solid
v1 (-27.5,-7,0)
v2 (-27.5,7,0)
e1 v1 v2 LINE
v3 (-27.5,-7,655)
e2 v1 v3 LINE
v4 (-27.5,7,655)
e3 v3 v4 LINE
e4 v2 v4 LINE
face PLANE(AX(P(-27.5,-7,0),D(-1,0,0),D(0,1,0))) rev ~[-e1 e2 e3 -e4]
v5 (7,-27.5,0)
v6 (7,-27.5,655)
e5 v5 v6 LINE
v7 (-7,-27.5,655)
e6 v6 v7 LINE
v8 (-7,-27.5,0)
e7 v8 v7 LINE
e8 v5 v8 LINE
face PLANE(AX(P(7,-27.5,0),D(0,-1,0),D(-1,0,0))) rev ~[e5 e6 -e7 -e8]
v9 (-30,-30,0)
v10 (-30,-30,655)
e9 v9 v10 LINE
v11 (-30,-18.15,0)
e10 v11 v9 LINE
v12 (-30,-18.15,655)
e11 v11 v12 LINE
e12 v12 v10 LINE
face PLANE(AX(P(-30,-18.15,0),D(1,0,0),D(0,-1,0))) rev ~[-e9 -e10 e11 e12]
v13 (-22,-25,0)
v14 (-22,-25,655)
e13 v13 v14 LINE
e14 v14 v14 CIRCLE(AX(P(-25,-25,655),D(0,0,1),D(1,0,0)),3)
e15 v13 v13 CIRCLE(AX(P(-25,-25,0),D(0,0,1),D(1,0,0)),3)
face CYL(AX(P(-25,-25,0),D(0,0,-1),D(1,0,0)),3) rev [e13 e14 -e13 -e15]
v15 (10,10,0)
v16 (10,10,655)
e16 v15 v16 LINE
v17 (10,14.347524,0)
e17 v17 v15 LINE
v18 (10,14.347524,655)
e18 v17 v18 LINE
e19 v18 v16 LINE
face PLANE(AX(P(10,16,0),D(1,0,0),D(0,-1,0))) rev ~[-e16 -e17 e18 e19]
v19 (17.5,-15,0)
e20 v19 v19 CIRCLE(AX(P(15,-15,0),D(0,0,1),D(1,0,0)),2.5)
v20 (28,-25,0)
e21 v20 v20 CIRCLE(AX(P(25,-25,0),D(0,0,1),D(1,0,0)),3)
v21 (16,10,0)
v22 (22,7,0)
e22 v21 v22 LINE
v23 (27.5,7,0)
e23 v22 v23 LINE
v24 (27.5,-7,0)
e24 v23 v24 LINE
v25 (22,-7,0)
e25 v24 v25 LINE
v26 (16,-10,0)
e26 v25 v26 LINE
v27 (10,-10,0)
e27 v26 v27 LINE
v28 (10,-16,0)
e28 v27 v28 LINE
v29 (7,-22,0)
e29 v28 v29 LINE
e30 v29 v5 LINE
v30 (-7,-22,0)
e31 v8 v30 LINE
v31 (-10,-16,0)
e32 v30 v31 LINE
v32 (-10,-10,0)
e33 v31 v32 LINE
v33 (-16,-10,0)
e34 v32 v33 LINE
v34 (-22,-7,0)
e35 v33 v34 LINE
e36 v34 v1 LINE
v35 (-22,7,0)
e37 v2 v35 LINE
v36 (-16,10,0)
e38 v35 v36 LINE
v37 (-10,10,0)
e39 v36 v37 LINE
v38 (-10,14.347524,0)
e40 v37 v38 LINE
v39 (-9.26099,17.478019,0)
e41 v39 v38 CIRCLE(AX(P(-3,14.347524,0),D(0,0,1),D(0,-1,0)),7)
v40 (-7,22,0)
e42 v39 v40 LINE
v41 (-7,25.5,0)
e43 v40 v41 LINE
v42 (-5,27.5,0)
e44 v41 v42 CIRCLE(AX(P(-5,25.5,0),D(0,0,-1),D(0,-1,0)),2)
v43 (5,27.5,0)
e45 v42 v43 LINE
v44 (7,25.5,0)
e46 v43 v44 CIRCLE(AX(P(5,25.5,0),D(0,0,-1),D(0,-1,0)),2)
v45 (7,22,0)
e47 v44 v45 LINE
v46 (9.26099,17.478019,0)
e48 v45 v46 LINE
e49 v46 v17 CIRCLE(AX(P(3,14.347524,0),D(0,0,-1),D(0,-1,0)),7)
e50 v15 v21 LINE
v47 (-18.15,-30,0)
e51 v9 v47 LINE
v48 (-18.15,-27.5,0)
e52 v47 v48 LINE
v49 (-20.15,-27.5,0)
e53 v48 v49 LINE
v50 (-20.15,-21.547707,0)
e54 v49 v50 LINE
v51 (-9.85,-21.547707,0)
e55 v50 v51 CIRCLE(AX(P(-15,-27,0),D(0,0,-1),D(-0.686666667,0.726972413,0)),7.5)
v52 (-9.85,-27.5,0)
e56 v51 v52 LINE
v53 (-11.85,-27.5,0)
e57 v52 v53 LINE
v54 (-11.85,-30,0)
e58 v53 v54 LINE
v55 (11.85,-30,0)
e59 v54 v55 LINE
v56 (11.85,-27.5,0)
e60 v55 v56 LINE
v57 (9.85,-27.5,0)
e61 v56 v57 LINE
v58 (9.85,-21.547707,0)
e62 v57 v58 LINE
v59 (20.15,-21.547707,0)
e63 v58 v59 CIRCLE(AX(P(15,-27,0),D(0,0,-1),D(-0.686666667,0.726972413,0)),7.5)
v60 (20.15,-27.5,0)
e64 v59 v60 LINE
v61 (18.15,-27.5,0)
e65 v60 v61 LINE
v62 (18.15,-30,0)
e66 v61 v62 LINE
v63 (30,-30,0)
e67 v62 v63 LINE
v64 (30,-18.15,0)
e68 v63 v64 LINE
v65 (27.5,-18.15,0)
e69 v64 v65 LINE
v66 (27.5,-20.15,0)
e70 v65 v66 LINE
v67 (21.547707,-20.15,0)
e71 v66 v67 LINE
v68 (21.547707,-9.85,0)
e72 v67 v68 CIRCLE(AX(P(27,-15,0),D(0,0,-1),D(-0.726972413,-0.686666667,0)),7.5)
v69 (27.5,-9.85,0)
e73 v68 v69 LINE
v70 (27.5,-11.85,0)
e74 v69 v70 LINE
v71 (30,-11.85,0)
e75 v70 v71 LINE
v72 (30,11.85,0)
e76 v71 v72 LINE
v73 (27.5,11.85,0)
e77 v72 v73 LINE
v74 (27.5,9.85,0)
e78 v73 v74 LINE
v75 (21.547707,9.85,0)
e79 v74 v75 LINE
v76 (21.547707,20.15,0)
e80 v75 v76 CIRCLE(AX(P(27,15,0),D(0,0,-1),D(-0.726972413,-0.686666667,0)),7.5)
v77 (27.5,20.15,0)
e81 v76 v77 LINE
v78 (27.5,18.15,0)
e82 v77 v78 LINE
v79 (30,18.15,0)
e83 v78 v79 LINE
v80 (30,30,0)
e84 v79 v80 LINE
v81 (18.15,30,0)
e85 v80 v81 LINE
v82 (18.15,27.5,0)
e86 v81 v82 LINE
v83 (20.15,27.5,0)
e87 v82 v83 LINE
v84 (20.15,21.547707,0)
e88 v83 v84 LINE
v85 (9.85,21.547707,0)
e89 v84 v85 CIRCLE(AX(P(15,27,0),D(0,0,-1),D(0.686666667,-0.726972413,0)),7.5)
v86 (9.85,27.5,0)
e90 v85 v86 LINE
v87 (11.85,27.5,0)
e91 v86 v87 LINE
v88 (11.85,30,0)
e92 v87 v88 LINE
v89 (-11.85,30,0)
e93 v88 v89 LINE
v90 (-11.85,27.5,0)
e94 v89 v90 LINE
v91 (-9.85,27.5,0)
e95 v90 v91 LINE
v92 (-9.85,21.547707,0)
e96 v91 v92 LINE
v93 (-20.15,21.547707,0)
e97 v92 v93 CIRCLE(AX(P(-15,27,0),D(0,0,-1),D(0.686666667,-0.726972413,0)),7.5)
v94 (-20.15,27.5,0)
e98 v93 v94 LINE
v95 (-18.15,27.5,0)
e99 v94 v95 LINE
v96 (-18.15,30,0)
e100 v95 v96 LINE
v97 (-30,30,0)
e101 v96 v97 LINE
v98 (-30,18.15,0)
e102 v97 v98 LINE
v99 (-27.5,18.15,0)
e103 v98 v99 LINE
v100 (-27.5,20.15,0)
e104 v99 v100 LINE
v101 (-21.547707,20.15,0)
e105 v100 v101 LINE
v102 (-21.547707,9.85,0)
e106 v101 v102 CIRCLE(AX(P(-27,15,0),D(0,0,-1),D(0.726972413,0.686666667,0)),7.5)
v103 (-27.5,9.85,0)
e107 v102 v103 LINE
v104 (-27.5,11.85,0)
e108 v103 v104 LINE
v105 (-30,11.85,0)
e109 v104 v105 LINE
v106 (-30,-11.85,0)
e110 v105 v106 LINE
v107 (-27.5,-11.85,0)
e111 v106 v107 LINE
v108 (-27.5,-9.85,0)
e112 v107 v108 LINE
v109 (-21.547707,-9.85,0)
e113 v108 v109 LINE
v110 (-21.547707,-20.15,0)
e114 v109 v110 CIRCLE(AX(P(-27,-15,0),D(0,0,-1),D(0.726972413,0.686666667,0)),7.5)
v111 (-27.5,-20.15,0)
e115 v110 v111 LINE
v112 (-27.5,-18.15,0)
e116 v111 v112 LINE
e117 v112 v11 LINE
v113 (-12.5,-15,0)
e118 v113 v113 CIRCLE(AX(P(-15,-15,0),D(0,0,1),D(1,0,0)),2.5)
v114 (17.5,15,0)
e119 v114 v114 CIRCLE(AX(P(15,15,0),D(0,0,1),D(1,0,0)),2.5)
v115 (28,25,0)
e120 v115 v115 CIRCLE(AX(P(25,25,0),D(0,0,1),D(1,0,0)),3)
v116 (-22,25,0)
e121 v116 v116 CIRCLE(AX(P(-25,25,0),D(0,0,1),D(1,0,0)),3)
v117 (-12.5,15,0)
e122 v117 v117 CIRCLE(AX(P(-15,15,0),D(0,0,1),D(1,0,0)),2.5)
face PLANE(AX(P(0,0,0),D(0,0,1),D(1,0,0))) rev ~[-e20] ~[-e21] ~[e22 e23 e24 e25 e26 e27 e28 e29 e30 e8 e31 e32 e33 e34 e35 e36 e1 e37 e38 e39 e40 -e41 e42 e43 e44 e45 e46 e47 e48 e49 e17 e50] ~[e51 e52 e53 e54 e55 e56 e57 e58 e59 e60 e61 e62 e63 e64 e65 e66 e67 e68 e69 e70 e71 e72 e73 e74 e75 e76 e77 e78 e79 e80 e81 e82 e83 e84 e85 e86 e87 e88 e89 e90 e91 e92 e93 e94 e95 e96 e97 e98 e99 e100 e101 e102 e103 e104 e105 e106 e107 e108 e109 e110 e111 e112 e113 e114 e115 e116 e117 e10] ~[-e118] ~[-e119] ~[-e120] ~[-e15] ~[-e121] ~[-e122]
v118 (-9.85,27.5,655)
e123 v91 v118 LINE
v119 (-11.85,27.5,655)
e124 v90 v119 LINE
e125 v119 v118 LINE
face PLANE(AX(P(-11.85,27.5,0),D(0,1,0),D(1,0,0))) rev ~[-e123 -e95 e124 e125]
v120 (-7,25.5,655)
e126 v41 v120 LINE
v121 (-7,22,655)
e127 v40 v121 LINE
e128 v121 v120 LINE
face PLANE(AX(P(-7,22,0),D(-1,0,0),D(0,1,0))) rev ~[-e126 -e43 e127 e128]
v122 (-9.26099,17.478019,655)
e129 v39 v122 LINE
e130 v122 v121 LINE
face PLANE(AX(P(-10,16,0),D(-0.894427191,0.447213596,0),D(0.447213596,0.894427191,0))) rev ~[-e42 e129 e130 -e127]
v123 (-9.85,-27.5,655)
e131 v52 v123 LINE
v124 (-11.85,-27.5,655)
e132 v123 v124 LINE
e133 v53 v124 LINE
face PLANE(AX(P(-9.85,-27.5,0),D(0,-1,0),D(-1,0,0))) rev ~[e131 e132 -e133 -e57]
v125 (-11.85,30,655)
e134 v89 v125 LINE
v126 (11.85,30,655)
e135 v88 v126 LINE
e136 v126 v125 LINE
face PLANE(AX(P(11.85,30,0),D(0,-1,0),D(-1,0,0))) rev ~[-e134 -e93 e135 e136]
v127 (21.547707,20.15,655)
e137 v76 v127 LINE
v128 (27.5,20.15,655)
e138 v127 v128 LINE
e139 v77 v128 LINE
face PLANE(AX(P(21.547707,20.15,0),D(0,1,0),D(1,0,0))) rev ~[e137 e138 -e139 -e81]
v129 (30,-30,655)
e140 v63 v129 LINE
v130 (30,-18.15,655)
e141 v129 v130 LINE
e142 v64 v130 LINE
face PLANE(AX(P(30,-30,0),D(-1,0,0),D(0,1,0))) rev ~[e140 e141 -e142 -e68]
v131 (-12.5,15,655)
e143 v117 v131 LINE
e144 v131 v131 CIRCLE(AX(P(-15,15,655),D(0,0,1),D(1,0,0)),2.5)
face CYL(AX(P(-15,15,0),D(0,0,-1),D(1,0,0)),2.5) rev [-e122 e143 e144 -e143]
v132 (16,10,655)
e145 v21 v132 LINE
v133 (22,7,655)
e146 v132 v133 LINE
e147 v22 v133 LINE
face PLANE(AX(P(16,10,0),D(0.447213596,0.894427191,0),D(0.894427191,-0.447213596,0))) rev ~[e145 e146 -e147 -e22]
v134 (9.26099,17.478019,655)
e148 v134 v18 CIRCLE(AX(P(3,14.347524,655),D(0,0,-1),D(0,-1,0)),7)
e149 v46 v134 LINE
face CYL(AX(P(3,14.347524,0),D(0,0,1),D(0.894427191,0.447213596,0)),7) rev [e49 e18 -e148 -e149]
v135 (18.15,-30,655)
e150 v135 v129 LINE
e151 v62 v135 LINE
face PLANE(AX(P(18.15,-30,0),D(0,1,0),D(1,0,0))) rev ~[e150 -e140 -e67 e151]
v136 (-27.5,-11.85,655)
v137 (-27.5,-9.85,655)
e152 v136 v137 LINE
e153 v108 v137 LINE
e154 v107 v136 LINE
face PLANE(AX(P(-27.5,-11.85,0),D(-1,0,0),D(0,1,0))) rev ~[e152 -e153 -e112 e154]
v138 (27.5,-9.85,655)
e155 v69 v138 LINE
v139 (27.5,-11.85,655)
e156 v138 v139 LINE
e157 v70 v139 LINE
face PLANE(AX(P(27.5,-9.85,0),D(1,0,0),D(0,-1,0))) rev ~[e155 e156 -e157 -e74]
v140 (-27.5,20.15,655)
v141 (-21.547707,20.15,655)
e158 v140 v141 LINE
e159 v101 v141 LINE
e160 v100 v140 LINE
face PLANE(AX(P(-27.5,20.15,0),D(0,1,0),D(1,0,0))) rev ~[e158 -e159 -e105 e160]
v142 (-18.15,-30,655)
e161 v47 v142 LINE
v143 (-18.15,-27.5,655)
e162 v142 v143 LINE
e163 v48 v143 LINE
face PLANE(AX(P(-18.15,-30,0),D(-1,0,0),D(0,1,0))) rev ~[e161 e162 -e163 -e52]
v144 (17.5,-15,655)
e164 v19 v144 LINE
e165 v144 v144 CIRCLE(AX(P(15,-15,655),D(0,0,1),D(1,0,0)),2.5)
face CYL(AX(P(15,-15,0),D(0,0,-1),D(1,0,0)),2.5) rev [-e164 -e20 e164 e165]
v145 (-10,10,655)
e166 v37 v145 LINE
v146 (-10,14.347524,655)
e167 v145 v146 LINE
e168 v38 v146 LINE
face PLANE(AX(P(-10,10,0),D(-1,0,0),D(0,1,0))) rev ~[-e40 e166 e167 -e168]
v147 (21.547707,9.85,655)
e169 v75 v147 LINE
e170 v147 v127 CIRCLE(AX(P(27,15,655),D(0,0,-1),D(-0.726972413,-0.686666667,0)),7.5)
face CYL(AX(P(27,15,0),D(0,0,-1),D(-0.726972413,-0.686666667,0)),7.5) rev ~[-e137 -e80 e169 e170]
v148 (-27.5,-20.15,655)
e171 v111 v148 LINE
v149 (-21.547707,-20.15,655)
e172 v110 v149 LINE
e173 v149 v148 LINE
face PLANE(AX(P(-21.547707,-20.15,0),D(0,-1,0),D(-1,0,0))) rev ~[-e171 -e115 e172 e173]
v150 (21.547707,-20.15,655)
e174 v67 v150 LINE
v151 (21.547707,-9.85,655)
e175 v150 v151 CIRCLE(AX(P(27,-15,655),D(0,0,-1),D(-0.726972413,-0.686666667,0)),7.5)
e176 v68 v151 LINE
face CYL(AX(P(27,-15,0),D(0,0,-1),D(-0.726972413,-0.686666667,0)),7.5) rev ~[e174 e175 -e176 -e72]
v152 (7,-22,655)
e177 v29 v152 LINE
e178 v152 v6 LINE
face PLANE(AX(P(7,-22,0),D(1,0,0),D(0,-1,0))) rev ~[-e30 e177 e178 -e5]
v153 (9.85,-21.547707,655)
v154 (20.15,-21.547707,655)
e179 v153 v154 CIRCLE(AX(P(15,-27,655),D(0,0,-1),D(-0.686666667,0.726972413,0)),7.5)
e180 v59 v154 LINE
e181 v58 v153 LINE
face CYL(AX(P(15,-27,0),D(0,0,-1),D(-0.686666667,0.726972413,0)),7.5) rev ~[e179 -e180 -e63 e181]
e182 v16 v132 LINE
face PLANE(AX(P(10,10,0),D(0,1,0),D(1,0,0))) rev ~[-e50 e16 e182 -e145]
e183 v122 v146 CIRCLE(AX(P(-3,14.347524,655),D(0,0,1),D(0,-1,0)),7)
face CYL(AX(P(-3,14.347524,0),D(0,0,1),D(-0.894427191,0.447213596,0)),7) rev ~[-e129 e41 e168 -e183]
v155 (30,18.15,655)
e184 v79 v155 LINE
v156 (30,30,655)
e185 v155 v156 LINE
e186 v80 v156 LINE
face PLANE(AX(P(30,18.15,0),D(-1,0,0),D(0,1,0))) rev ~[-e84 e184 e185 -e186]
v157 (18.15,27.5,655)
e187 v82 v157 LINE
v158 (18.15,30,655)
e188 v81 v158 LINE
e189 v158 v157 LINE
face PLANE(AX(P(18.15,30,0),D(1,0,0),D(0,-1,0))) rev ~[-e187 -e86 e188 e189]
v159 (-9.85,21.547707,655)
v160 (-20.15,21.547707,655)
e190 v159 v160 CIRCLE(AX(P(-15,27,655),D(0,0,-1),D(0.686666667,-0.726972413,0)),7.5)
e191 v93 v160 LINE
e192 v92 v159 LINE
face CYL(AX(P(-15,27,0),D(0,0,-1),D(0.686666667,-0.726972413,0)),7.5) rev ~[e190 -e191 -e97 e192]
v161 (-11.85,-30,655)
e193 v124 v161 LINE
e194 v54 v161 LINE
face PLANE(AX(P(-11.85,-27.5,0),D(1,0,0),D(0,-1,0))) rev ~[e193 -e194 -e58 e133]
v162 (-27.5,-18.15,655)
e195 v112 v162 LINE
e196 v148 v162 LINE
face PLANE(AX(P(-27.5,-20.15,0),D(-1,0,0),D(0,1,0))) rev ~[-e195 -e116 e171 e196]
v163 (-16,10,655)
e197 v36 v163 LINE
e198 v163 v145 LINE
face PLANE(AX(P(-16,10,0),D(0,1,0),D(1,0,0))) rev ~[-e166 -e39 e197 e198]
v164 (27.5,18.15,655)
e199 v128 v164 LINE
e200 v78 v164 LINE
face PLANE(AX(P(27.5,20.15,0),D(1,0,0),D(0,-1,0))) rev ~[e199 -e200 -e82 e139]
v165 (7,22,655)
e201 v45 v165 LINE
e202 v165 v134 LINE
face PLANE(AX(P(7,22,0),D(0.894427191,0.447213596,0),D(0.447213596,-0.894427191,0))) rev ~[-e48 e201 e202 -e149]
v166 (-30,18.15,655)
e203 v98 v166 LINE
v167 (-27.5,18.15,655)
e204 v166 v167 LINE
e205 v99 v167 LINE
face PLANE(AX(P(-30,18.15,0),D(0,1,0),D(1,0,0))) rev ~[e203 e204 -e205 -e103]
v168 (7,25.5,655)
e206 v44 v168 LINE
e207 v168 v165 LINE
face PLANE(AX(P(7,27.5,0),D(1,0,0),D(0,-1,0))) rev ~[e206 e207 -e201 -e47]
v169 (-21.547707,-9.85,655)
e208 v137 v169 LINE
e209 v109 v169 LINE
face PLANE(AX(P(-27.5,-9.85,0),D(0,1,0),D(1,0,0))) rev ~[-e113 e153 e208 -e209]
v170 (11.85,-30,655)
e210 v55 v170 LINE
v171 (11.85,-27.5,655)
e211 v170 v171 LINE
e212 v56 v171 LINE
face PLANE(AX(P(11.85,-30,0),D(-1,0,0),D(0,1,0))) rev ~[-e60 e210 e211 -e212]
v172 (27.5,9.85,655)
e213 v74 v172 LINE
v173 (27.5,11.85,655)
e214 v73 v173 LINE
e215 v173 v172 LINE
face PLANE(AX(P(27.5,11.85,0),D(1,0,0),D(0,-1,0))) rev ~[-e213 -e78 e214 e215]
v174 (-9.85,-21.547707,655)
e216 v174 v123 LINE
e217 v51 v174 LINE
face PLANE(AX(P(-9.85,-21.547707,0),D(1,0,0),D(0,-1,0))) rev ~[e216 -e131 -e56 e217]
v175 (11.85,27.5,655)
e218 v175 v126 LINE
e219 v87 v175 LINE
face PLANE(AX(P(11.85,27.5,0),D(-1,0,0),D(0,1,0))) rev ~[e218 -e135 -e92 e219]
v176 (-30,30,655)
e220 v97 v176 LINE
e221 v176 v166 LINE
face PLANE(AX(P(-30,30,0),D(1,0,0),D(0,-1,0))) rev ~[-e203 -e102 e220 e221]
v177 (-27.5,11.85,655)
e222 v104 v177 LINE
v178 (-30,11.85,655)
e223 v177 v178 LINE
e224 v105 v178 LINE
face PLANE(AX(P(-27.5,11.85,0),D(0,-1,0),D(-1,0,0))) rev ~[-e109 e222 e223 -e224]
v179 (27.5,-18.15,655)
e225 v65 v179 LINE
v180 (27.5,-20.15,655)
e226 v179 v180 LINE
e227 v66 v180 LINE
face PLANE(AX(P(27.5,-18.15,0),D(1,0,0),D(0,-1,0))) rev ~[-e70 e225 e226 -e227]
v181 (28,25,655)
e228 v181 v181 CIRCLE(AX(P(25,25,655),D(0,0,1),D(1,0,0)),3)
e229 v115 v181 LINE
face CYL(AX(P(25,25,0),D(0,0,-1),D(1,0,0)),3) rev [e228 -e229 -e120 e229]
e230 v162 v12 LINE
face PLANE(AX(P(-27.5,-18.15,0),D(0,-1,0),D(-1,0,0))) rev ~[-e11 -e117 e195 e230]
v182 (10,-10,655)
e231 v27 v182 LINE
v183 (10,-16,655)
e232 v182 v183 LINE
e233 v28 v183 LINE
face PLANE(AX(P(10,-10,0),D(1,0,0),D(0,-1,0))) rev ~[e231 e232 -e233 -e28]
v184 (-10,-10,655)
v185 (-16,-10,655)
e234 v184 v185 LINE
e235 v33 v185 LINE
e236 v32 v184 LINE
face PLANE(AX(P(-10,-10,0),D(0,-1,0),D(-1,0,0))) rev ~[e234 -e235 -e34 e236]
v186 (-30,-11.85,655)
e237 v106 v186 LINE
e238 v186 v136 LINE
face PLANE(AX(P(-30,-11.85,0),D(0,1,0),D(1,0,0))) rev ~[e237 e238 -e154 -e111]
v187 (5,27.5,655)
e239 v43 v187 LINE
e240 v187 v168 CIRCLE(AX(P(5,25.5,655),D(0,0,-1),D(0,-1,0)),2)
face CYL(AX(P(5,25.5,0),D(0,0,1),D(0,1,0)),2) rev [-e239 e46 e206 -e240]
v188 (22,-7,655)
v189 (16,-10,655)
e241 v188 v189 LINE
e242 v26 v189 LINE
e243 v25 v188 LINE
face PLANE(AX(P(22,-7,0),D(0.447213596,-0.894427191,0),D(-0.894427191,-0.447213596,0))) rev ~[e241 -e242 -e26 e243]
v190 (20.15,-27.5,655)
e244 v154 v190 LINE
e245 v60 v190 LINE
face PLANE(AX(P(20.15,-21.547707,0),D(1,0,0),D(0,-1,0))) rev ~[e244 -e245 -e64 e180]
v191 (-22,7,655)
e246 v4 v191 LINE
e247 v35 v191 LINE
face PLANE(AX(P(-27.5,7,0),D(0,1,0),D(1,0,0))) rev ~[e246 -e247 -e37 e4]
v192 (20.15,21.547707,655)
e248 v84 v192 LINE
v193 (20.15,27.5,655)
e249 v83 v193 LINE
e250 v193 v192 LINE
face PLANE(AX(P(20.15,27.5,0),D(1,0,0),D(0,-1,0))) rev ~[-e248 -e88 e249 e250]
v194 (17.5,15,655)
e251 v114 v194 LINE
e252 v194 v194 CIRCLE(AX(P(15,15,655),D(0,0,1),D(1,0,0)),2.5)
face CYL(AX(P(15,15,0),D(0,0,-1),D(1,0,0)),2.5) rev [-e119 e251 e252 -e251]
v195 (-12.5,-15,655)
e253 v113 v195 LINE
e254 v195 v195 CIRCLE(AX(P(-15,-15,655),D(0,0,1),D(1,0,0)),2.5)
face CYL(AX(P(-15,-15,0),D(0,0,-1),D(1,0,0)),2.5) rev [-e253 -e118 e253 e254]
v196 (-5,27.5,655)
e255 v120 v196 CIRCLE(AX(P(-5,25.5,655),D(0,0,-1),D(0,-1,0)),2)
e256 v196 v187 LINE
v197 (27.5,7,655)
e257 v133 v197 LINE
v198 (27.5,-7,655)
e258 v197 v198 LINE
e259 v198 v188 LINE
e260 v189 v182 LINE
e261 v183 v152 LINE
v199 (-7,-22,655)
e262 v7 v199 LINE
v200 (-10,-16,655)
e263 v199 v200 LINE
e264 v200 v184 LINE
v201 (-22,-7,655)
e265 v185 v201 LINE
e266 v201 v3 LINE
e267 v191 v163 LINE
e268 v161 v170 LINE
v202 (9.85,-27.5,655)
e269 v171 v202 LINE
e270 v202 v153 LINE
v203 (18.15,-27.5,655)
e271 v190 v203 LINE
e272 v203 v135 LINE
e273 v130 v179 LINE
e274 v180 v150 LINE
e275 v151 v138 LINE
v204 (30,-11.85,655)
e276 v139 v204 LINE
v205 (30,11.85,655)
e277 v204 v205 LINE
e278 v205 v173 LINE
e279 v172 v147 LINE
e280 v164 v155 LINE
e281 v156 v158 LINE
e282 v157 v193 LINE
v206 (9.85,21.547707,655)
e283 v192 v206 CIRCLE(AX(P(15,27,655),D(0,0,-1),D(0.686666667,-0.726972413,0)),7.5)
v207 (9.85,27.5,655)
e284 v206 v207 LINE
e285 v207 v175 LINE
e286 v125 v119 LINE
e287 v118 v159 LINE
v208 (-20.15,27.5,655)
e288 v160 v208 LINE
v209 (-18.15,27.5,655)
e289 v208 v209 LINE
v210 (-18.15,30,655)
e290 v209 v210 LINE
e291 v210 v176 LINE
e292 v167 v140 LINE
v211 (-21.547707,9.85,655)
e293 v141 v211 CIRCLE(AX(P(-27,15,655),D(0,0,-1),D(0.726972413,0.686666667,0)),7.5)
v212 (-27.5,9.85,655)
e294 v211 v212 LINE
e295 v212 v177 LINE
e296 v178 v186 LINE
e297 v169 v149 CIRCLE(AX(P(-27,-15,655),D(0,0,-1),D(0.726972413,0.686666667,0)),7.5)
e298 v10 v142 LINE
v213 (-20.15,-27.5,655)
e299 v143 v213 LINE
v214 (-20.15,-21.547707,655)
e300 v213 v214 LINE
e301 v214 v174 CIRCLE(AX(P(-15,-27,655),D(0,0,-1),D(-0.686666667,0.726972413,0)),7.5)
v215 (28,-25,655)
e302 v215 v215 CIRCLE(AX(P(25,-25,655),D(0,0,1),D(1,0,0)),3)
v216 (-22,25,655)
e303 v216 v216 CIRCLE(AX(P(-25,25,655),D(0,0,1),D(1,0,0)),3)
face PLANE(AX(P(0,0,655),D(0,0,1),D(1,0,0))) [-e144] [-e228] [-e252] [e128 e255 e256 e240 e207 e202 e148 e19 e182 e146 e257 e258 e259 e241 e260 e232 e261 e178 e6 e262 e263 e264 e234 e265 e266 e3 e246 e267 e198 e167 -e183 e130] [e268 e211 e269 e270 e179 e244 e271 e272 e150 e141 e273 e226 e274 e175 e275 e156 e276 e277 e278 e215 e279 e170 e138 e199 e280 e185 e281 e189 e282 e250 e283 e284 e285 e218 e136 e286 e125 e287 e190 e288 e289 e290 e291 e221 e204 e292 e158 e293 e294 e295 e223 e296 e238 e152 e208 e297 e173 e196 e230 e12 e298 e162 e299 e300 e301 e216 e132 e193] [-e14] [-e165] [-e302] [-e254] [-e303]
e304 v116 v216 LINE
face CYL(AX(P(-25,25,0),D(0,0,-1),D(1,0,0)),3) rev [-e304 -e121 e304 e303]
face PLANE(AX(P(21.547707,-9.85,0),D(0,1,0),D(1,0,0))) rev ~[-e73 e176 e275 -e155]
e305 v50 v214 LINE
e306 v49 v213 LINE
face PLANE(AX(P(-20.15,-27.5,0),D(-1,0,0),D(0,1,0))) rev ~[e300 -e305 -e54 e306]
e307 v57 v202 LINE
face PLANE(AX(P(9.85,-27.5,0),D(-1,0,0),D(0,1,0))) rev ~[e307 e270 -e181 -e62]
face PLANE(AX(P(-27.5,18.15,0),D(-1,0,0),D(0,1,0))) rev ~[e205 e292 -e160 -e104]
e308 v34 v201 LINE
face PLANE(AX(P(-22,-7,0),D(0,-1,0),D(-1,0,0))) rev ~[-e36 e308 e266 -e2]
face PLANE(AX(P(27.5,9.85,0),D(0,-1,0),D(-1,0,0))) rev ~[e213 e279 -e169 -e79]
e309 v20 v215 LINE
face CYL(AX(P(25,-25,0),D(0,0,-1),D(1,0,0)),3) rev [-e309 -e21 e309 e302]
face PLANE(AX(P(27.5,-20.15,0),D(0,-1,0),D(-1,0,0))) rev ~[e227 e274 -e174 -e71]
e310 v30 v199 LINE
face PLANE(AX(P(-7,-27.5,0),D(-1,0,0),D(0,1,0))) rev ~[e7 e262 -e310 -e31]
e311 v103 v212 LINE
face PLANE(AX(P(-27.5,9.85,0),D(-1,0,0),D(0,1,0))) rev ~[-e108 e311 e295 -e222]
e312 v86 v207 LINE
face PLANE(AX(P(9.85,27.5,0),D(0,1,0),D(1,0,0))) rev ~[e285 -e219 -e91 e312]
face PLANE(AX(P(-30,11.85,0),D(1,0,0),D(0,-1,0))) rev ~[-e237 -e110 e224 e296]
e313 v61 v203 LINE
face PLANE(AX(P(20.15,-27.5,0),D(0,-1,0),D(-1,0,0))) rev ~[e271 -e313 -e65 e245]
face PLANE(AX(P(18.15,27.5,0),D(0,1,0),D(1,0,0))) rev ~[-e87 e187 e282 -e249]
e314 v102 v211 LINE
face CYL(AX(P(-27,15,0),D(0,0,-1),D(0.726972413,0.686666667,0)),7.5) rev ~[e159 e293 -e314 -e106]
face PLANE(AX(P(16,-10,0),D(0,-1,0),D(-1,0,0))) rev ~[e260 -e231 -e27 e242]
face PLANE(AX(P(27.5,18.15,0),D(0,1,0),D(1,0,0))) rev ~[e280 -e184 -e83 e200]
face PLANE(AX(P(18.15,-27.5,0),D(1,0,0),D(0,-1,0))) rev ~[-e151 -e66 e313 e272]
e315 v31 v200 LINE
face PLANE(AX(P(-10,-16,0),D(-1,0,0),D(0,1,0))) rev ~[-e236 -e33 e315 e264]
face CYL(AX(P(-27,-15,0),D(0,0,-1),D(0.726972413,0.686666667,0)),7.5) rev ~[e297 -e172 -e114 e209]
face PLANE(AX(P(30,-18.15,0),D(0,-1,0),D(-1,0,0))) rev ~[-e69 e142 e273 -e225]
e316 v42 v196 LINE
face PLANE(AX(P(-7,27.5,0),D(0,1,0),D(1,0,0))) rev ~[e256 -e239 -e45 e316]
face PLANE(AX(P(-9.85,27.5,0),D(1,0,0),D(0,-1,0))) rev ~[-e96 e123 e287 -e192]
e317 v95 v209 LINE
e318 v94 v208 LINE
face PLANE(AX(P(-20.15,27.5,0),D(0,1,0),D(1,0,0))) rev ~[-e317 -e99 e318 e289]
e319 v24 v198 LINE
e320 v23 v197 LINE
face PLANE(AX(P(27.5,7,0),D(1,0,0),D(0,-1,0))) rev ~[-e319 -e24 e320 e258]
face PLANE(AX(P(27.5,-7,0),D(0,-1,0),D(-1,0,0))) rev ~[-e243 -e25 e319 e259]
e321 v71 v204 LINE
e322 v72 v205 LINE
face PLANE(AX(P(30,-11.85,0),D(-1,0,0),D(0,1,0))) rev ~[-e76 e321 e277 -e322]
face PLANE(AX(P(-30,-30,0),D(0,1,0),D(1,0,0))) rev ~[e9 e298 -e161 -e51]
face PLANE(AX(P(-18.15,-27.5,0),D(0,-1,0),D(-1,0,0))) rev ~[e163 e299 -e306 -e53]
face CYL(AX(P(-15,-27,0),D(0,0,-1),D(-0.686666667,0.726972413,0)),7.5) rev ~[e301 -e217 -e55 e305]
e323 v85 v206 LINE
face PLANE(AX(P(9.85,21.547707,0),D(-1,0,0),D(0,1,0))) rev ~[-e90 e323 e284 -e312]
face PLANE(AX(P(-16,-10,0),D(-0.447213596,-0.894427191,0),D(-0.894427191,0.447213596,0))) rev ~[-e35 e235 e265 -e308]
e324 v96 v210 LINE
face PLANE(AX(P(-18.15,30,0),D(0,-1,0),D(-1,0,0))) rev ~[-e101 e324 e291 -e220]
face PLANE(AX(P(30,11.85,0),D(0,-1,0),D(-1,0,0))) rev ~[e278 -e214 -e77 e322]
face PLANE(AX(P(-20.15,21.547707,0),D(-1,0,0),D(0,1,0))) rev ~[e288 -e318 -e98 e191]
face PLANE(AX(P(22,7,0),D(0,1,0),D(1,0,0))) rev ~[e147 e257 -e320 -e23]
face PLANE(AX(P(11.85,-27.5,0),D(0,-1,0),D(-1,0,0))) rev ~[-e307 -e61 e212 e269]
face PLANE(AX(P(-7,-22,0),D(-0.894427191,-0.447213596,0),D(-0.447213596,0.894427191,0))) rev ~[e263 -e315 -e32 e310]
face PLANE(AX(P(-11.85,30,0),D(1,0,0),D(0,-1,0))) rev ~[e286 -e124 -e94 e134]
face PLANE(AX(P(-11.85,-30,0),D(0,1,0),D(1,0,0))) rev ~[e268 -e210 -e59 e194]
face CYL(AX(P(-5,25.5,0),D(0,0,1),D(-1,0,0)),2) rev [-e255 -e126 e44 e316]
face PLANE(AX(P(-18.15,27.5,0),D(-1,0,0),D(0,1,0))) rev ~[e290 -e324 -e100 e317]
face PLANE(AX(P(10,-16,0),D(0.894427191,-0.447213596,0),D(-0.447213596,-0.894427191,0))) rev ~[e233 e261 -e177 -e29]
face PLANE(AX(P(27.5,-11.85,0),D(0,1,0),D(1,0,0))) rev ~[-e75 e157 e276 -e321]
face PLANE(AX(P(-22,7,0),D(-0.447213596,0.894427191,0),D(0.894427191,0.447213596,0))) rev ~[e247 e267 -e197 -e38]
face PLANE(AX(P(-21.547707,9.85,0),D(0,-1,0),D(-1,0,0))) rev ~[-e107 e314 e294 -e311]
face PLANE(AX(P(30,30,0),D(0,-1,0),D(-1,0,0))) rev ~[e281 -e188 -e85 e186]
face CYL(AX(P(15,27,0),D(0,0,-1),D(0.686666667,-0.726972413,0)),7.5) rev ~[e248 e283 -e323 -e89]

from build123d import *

# Parameters (mm, degrees)
F0_R     = 3
F0_R_2   = 2.5
F1_DEPTH = 655
F2_R     = 2
F3_R     = 7


# Not quite as in the source:
# - a feature names something its author has since deleted; it is built from what else it names


with BuildPart() as f1:
    # F0 (on Top) → F1 (new body)
    with BuildSketch(Plane.XY):
        with BuildLine():
            Line((18.15, -30), (30, -30))
            Line((30, -30), (30, -18.15))
            Line((30, -18.15), (27.5, -18.15))
            Line((27.5, -18.15), (27.5, -20.15))
            Line((27.5, -20.15), (21.5477069044, -20.15))
            ThreePointArc((21.5477069044, -20.15), (19.5, -15), (21.5477069044, -9.85))
            Line((21.5477069044, -9.85), (27.5, -9.85))
            Line((27.5, -9.85), (27.5, -11.85))
            Line((27.5, -11.85), (30, -11.85))
            Line((30, -11.85), (30, 11.85))
            Line((30, 11.85), (27.5, 11.85))
            Line((27.5, 11.85), (27.5, 9.85))
            Line((27.5, 9.85), (21.5477069044, 9.85))
            ThreePointArc((21.5477069044, 9.85), (19.5, 15), (21.5477069044, 20.15))
            Line((21.5477069044, 20.15), (27.5, 20.15))
            Line((27.5, 20.15), (27.5, 18.15))
            Line((27.5, 18.15), (30, 18.15))
            Line((30, 18.15), (30, 30))
            Line((30, 30), (18.15, 30))
            Line((18.15, 30), (18.15, 27.5))
            Line((18.15, 27.5), (20.15, 27.5))
            Line((20.15, 27.5), (20.15, 21.5477069044))
            ThreePointArc((20.15, 21.5477069044), (15, 19.5), (9.85, 21.5477069044))
            Line((9.85, 21.5477069044), (9.85, 27.5))
            Line((9.85, 27.5), (11.85, 27.5))
            Line((11.85, 27.5), (11.85, 30))
            Line((11.85, 30), (-11.85, 30))
            Line((-11.85, 30), (-11.85, 27.5))
            Line((-11.85, 27.5), (-9.85, 27.5))
            Line((-9.85, 27.5), (-9.85, 21.5477069044))
            ThreePointArc((-9.85, 21.5477069044), (-15, 19.5), (-20.15, 21.5477069044))
            Line((-20.15, 21.5477069044), (-20.15, 27.5))
            Line((-20.15, 27.5), (-18.15, 27.5))
            Line((-18.15, 27.5), (-18.15, 30))
            Line((-18.15, 30), (-30, 30))
            Line((-30, 30), (-30, 18.15))
            Line((-30, 18.15), (-27.5, 18.15))
            Line((-27.5, 18.15), (-27.5, 20.15))
            Line((-27.5, 20.15), (-21.5477069044, 20.15))
            ThreePointArc((-21.5477069044, 20.15), (-19.5, 15), (-21.5477069044, 9.85))
            Line((-21.5477069044, 9.85), (-27.5, 9.85))
            Line((-27.5, 9.85), (-27.5, 11.85))
            Line((-27.5, 11.85), (-30, 11.85))
            Line((-30, 11.85), (-30, -11.85))
            Line((-30, -11.85), (-27.5, -11.85))
            Line((-27.5, -11.85), (-27.5, -9.85))
            Line((-27.5, -9.85), (-21.5477069044, -9.85))
            ThreePointArc((-21.5477069044, -9.85), (-19.5, -15), (-21.5477069044, -20.15))
            Line((-21.5477069044, -20.15), (-27.5, -20.15))
            Line((-27.5, -20.15), (-27.5, -18.15))
            Line((-27.5, -18.15), (-30, -18.15))
            Line((-30, -18.15), (-30, -30))
            Line((-30, -30), (-18.15, -30))
            Line((-18.15, -30), (-18.15, -27.5))
            Line((-18.15, -27.5), (-20.15, -27.5))
            Line((-20.15, -27.5), (-20.15, -21.5477069044))
            ThreePointArc((-20.15, -21.5477069044), (-15, -19.5), (-9.85, -21.5477069044))
            Line((-9.85, -21.5477069044), (-9.85, -27.5))
            Line((-9.85, -27.5), (-11.85, -27.5))
            Line((-11.85, -27.5), (-11.85, -30))
            Line((-11.85, -30), (11.85, -30))
            Line((11.85, -30), (11.85, -27.5))
            Line((11.85, -27.5), (9.85, -27.5))
            Line((9.85, -27.5), (9.85, -21.5477069044))
            ThreePointArc((9.85, -21.5477069044), (15, -19.5), (20.15, -21.5477069044))
            Line((20.15, -21.5477069044), (20.15, -27.5))
            Line((20.15, -27.5), (18.15, -27.5))
            Line((18.15, -27.5), (18.15, -30))
        make_face()
        with Locations((-25, -25)):
            Circle(F0_R, mode=Mode.SUBTRACT)
        with Locations((-15, -15)):
            Circle(F0_R_2, mode=Mode.SUBTRACT)
        with Locations((25, -25)):
            Circle(F0_R, mode=Mode.SUBTRACT)
        with Locations((15, -15)):
            Circle(F0_R_2, mode=Mode.SUBTRACT)
        with Locations((-25, 25)):
            Circle(F0_R, mode=Mode.SUBTRACT)
        with Locations((-15, 15)):
            Circle(F0_R_2, mode=Mode.SUBTRACT)
        Polygon((-7, 22), (-7, 27.5), (0, 27.5), (7, 27.5), (7, 22), (10, 16), (10, 10), (16, 10), (22, 7), (27.5, 7), (27.5, 0), (27.5, -7), (22, -7), (16, -10), (10, -10), (10, -16), (7, -22), (7, -27.5), (0, -27.5), (-7, -27.5), (-7, -22), (-10, -16), (-10, -10), (-16, -10), (-22, -7), (-27.5, -7), (-27.5, 0), (-27.5, 7), (-22, 7), (-16, 10), (-10, 10), (-10, 16), align=None, mode=Mode.SUBTRACT)
        with Locations((15, 15)):
            Circle(F0_R_2, mode=Mode.SUBTRACT)
        with Locations((25, 25)):
            Circle(F0_R, mode=Mode.SUBTRACT)
    extrude(amount=F1_DEPTH)

    # F2
    f2_edges = [f1.edges().sort_by_distance(p)[0] for p in [
        (-7, 27.5, 327.5),
        (7, 27.5, 327.5),
    ]]
    fillet(f2_edges, radius=F2_R)

    # F3
    f3_edges = [f1.edges().sort_by_distance(p)[0] for p in [
        (-10, 16, 327.5),
        (10, 16, 327.5),
    ]]
    fillet(f3_edges, radius=F3_R)


solid = f1.part
